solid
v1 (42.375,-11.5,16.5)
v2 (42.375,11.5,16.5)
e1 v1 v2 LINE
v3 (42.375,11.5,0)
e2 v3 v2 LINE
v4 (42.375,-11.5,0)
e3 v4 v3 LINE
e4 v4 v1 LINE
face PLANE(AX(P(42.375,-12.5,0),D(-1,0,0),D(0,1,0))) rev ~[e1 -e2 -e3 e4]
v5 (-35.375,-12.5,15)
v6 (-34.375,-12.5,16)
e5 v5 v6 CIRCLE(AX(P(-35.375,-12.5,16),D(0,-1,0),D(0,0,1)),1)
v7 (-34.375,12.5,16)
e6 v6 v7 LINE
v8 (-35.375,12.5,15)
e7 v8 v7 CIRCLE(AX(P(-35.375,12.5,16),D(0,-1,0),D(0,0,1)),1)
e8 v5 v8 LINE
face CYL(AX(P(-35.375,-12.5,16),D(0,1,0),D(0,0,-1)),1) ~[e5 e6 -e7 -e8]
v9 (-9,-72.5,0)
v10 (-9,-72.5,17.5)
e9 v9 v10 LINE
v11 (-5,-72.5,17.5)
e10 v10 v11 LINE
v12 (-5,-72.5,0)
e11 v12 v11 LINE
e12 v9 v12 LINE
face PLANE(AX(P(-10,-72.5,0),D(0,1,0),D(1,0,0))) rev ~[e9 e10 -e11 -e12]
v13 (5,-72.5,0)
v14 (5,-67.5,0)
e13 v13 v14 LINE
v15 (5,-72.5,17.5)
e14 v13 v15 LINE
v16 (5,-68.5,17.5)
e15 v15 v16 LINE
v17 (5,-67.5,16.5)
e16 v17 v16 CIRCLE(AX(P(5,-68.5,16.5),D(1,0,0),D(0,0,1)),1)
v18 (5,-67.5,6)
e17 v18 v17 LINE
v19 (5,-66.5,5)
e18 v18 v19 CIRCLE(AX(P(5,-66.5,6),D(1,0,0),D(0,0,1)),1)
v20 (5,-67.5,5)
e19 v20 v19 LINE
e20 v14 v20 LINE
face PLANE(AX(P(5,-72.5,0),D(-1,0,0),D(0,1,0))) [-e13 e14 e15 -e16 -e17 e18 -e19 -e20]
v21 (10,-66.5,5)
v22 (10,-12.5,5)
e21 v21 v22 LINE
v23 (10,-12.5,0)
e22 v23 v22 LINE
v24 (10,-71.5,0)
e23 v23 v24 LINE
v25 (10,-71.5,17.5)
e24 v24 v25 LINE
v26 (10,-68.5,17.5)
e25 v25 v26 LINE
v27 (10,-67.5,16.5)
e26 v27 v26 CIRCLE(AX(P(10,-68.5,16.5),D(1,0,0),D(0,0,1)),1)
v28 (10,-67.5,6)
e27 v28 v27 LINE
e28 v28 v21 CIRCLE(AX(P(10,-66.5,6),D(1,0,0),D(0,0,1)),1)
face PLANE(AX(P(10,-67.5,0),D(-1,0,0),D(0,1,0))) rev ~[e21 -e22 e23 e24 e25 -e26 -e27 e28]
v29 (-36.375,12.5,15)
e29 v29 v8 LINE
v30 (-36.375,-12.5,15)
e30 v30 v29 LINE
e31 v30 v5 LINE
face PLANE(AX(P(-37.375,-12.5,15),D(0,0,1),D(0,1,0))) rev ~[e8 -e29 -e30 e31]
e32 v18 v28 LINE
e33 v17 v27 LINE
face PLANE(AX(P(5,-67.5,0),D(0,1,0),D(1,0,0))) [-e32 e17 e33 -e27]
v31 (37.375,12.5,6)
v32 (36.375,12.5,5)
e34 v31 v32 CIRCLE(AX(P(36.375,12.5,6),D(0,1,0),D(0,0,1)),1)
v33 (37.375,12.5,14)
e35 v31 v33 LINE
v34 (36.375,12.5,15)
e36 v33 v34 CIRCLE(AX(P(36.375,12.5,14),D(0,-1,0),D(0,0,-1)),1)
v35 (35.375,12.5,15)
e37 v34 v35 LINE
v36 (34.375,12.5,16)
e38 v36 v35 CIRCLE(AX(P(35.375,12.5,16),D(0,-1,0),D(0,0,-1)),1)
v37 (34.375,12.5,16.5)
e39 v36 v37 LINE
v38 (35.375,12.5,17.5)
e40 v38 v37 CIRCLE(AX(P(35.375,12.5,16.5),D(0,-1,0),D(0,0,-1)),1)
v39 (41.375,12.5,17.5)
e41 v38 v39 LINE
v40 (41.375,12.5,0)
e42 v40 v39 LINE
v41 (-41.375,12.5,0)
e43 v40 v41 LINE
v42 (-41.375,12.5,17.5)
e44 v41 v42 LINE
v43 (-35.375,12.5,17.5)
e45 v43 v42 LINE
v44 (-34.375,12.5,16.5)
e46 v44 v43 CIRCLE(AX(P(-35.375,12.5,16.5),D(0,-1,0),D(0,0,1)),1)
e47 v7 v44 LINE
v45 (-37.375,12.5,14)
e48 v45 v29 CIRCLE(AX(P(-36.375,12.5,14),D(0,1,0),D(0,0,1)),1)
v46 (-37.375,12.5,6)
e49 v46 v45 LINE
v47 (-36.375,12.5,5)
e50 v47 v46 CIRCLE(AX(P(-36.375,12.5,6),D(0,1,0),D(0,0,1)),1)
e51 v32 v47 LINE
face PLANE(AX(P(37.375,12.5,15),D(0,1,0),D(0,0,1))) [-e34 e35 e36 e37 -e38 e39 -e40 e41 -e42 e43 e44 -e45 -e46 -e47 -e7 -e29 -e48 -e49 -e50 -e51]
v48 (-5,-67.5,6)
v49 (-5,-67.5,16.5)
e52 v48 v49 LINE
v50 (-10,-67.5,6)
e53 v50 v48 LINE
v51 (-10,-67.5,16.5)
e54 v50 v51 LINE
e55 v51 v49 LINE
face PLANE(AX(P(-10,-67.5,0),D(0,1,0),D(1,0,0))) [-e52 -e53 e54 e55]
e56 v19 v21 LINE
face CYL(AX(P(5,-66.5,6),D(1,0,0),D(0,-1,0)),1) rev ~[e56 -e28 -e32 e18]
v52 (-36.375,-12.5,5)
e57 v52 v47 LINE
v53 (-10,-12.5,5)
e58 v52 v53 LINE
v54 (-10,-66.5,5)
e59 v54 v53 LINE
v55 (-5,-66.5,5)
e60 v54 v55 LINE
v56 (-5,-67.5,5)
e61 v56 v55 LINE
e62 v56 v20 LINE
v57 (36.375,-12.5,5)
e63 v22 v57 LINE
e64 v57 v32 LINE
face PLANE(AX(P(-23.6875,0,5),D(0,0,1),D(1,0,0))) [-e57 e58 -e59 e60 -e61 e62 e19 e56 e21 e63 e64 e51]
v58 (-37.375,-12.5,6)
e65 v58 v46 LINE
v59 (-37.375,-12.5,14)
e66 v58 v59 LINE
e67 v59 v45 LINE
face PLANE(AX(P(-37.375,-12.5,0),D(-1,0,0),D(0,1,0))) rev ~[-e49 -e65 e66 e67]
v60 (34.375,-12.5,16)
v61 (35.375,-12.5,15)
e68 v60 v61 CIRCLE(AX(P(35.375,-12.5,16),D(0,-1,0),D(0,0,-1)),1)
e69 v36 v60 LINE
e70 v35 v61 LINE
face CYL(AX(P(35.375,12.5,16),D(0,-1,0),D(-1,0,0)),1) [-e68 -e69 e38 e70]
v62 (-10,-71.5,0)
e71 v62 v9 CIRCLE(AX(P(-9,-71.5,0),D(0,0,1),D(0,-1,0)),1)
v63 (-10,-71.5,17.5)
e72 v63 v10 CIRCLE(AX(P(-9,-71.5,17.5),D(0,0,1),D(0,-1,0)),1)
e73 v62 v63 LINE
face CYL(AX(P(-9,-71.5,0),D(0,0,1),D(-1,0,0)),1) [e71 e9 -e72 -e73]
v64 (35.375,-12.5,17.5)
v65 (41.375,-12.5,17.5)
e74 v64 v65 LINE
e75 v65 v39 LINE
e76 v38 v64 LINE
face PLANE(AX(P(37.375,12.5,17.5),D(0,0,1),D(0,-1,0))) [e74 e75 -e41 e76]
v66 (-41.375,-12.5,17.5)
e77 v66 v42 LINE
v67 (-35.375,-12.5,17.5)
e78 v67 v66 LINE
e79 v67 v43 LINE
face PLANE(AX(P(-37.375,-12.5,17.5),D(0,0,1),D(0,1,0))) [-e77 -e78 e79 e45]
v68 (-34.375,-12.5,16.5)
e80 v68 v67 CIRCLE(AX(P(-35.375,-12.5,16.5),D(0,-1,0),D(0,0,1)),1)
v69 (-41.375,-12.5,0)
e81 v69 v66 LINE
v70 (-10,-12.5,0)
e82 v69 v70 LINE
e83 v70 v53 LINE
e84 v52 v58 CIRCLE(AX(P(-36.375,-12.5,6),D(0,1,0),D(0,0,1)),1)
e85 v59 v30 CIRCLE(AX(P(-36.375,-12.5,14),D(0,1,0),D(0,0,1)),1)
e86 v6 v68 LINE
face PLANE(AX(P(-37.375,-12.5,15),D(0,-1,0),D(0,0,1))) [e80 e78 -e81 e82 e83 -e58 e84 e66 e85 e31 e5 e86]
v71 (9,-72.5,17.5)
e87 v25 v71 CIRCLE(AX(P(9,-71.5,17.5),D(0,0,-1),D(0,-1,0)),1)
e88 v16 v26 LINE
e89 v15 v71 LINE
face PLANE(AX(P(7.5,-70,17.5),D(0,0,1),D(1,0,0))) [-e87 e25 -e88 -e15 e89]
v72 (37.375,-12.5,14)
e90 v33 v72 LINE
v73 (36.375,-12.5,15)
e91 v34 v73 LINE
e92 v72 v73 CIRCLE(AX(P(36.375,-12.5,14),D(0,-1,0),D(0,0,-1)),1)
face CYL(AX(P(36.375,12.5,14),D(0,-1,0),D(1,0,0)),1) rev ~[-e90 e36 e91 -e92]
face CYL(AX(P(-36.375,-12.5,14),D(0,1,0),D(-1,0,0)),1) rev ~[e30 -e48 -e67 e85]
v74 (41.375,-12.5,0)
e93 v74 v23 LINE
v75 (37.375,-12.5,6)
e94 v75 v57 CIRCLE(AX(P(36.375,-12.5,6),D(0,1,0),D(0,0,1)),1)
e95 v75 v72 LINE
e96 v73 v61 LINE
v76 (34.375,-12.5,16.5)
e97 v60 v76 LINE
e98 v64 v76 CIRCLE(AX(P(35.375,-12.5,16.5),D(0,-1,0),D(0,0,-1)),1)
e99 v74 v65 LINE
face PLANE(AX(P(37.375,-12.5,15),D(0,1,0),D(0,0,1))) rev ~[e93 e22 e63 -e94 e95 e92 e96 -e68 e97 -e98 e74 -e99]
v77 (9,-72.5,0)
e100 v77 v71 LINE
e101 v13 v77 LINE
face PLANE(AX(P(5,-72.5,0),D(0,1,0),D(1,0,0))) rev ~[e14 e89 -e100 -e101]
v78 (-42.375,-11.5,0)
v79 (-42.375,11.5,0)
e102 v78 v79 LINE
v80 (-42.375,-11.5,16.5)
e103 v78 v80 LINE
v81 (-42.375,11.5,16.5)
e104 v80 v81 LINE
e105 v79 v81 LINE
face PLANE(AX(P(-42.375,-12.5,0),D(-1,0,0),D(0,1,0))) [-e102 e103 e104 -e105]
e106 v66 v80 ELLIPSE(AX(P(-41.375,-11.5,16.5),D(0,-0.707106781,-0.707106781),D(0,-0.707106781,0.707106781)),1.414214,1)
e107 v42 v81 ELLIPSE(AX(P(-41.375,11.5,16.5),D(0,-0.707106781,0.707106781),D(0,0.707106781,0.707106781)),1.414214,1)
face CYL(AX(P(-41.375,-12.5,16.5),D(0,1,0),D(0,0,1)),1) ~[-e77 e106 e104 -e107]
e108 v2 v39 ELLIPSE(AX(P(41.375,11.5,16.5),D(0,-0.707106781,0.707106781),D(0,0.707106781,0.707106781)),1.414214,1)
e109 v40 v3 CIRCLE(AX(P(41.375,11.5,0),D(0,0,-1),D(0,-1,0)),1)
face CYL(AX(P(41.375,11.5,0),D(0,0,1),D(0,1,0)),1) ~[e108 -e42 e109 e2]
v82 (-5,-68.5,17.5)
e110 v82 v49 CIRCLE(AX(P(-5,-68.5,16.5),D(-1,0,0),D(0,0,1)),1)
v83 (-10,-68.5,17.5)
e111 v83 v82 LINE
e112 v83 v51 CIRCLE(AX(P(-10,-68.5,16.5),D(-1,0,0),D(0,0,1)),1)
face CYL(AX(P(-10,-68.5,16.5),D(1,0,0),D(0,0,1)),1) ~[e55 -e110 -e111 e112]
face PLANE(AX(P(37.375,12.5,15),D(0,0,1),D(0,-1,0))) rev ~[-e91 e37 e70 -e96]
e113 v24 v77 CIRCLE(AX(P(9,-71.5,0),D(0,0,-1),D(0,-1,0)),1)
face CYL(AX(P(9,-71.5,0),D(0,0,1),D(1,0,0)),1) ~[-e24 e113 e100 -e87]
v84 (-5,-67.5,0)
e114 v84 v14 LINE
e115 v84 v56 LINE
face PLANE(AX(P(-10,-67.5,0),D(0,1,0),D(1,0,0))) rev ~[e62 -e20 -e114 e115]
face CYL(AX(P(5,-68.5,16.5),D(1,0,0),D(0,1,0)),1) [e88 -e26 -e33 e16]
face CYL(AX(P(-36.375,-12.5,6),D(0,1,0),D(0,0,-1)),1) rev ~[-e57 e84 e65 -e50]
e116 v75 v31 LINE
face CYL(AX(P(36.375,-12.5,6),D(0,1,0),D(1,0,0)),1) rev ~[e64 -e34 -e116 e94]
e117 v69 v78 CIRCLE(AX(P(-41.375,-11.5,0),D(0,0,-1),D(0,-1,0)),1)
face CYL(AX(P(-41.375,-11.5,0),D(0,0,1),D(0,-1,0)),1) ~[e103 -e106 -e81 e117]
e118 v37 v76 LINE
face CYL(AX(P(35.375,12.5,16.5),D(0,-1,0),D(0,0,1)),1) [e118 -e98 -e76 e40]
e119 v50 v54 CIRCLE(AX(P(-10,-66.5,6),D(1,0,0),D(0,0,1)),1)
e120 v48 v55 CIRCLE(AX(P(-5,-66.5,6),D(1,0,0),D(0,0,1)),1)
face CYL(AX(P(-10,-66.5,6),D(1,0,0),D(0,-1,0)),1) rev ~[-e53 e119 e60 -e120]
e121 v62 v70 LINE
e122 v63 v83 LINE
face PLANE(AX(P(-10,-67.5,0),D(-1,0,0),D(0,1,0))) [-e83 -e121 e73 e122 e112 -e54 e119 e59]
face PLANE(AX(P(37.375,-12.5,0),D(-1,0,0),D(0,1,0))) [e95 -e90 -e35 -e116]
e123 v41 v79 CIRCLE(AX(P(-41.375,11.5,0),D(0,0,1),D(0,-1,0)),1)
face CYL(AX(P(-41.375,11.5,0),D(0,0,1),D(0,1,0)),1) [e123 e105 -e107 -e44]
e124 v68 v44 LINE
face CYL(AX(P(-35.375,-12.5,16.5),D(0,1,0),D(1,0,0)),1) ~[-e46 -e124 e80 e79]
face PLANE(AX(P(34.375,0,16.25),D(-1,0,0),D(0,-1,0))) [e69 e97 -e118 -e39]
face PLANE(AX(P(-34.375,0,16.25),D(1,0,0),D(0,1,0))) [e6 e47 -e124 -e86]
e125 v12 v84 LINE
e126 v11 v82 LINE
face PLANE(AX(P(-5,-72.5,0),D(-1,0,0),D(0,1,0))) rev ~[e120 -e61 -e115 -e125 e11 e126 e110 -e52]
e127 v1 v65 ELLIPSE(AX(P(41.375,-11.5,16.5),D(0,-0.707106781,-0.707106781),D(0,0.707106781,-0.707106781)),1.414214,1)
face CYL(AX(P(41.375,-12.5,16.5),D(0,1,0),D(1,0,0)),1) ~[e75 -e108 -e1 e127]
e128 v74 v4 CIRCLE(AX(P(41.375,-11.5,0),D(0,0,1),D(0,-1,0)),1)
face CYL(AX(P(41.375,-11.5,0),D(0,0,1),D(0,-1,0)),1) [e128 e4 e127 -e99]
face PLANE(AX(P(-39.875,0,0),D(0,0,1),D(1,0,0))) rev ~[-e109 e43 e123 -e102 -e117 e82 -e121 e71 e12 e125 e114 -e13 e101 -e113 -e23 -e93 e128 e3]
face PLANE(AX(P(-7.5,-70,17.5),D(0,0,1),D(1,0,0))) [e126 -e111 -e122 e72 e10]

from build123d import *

# Parameters (mm, degrees)
F0_W     = 27.375
F0_H     = 25
F0_W_2   = 20
F0_H_2   = 55
F1_DEPTH = 5
F2_W     = 5
F2_H     = 25
F2_H_2   = 5
F3_DEPTH = 17.5
F4_W     = 25
F4_H     = 2.5
F5_DEPTH = 3
F6_W     = 25
F6_H     = 2.5
F7_DEPTH = 3
F8_R     = 1


with BuildPart() as f1:
    # F0 (on Top) → F1 (new body)
    with BuildSketch(Plane.XY):
        with Locations((-23.6875, 0)):
            Rectangle(F0_W, F0_H)
        Rectangle(F0_W_2, F0_H)
        with Locations((23.6875, 0)):
            Rectangle(F0_W, F0_H)
        with Locations((0, -40)):
            Rectangle(F0_W_2, F0_H_2)
    extrude(amount=F1_DEPTH)

    # F2 (on Top) → F3 (join)
    with BuildSketch(Plane.XY):
        with Locations((-39.875, 0)):
            Rectangle(F2_W, F2_H)
        with Locations((39.875, 0)):
            Rectangle(F2_W, F2_H)
        with Locations((-7.5, -70)):
            Rectangle(F2_W, F2_H_2)
        with Locations((7.5, -70)):
            Rectangle(F2_W, F2_H_2)
    extrude(amount=F3_DEPTH)

    # F4 (on face) → F5 (join)
    with BuildSketch(Plane.YZ.offset(-37.375)):
        with Locations((0, 16.25)):
            Rectangle(F4_W, F4_H)
    extrude(amount=F5_DEPTH)

    # F6 (on face) → F7 (join)
    with BuildSketch(Plane(origin=(37.375, 0, 0), x_dir=(0, -1, 0), z_dir=(-1, 0, 0))):
        with Locations((0, 16.25)):
            Rectangle(F6_W, F6_H)
    extrude(amount=F7_DEPTH)

    # F8
    f8_edges = [f1.edges().sort_by_distance(p)[0] for p in [
        (-37.375, 0, 5),
        (37.375, 0, 5),
        (7.5, -67.5, 17.5),
        (-7.5, -67.5, 17.5),
        (7.5, -67.5, 5),
        (-7.5, -67.5, 5),
        (-42.375, -12.5, 8.75),
        (-42.375, 12.5, 8.75),
        (-42.375, 0, 17.5),
        (42.375, 0, 17.5),
        (42.375, -12.5, 8.75),
        (42.375, 12.5, 8.75),
        (-10, -72.5, 8.75),
        (10, -72.5, 8.75),
        (-34.375, 0, 17.5),
        (-34.375, 0, 15),
        (34.375, 0, 17.5),
        (34.375, 0, 15),
        (37.375, 0, 15),
        (-37.375, 0, 15),
    ]]
    fillet(f8_edges, radius=F8_R)


solid = f1.part
